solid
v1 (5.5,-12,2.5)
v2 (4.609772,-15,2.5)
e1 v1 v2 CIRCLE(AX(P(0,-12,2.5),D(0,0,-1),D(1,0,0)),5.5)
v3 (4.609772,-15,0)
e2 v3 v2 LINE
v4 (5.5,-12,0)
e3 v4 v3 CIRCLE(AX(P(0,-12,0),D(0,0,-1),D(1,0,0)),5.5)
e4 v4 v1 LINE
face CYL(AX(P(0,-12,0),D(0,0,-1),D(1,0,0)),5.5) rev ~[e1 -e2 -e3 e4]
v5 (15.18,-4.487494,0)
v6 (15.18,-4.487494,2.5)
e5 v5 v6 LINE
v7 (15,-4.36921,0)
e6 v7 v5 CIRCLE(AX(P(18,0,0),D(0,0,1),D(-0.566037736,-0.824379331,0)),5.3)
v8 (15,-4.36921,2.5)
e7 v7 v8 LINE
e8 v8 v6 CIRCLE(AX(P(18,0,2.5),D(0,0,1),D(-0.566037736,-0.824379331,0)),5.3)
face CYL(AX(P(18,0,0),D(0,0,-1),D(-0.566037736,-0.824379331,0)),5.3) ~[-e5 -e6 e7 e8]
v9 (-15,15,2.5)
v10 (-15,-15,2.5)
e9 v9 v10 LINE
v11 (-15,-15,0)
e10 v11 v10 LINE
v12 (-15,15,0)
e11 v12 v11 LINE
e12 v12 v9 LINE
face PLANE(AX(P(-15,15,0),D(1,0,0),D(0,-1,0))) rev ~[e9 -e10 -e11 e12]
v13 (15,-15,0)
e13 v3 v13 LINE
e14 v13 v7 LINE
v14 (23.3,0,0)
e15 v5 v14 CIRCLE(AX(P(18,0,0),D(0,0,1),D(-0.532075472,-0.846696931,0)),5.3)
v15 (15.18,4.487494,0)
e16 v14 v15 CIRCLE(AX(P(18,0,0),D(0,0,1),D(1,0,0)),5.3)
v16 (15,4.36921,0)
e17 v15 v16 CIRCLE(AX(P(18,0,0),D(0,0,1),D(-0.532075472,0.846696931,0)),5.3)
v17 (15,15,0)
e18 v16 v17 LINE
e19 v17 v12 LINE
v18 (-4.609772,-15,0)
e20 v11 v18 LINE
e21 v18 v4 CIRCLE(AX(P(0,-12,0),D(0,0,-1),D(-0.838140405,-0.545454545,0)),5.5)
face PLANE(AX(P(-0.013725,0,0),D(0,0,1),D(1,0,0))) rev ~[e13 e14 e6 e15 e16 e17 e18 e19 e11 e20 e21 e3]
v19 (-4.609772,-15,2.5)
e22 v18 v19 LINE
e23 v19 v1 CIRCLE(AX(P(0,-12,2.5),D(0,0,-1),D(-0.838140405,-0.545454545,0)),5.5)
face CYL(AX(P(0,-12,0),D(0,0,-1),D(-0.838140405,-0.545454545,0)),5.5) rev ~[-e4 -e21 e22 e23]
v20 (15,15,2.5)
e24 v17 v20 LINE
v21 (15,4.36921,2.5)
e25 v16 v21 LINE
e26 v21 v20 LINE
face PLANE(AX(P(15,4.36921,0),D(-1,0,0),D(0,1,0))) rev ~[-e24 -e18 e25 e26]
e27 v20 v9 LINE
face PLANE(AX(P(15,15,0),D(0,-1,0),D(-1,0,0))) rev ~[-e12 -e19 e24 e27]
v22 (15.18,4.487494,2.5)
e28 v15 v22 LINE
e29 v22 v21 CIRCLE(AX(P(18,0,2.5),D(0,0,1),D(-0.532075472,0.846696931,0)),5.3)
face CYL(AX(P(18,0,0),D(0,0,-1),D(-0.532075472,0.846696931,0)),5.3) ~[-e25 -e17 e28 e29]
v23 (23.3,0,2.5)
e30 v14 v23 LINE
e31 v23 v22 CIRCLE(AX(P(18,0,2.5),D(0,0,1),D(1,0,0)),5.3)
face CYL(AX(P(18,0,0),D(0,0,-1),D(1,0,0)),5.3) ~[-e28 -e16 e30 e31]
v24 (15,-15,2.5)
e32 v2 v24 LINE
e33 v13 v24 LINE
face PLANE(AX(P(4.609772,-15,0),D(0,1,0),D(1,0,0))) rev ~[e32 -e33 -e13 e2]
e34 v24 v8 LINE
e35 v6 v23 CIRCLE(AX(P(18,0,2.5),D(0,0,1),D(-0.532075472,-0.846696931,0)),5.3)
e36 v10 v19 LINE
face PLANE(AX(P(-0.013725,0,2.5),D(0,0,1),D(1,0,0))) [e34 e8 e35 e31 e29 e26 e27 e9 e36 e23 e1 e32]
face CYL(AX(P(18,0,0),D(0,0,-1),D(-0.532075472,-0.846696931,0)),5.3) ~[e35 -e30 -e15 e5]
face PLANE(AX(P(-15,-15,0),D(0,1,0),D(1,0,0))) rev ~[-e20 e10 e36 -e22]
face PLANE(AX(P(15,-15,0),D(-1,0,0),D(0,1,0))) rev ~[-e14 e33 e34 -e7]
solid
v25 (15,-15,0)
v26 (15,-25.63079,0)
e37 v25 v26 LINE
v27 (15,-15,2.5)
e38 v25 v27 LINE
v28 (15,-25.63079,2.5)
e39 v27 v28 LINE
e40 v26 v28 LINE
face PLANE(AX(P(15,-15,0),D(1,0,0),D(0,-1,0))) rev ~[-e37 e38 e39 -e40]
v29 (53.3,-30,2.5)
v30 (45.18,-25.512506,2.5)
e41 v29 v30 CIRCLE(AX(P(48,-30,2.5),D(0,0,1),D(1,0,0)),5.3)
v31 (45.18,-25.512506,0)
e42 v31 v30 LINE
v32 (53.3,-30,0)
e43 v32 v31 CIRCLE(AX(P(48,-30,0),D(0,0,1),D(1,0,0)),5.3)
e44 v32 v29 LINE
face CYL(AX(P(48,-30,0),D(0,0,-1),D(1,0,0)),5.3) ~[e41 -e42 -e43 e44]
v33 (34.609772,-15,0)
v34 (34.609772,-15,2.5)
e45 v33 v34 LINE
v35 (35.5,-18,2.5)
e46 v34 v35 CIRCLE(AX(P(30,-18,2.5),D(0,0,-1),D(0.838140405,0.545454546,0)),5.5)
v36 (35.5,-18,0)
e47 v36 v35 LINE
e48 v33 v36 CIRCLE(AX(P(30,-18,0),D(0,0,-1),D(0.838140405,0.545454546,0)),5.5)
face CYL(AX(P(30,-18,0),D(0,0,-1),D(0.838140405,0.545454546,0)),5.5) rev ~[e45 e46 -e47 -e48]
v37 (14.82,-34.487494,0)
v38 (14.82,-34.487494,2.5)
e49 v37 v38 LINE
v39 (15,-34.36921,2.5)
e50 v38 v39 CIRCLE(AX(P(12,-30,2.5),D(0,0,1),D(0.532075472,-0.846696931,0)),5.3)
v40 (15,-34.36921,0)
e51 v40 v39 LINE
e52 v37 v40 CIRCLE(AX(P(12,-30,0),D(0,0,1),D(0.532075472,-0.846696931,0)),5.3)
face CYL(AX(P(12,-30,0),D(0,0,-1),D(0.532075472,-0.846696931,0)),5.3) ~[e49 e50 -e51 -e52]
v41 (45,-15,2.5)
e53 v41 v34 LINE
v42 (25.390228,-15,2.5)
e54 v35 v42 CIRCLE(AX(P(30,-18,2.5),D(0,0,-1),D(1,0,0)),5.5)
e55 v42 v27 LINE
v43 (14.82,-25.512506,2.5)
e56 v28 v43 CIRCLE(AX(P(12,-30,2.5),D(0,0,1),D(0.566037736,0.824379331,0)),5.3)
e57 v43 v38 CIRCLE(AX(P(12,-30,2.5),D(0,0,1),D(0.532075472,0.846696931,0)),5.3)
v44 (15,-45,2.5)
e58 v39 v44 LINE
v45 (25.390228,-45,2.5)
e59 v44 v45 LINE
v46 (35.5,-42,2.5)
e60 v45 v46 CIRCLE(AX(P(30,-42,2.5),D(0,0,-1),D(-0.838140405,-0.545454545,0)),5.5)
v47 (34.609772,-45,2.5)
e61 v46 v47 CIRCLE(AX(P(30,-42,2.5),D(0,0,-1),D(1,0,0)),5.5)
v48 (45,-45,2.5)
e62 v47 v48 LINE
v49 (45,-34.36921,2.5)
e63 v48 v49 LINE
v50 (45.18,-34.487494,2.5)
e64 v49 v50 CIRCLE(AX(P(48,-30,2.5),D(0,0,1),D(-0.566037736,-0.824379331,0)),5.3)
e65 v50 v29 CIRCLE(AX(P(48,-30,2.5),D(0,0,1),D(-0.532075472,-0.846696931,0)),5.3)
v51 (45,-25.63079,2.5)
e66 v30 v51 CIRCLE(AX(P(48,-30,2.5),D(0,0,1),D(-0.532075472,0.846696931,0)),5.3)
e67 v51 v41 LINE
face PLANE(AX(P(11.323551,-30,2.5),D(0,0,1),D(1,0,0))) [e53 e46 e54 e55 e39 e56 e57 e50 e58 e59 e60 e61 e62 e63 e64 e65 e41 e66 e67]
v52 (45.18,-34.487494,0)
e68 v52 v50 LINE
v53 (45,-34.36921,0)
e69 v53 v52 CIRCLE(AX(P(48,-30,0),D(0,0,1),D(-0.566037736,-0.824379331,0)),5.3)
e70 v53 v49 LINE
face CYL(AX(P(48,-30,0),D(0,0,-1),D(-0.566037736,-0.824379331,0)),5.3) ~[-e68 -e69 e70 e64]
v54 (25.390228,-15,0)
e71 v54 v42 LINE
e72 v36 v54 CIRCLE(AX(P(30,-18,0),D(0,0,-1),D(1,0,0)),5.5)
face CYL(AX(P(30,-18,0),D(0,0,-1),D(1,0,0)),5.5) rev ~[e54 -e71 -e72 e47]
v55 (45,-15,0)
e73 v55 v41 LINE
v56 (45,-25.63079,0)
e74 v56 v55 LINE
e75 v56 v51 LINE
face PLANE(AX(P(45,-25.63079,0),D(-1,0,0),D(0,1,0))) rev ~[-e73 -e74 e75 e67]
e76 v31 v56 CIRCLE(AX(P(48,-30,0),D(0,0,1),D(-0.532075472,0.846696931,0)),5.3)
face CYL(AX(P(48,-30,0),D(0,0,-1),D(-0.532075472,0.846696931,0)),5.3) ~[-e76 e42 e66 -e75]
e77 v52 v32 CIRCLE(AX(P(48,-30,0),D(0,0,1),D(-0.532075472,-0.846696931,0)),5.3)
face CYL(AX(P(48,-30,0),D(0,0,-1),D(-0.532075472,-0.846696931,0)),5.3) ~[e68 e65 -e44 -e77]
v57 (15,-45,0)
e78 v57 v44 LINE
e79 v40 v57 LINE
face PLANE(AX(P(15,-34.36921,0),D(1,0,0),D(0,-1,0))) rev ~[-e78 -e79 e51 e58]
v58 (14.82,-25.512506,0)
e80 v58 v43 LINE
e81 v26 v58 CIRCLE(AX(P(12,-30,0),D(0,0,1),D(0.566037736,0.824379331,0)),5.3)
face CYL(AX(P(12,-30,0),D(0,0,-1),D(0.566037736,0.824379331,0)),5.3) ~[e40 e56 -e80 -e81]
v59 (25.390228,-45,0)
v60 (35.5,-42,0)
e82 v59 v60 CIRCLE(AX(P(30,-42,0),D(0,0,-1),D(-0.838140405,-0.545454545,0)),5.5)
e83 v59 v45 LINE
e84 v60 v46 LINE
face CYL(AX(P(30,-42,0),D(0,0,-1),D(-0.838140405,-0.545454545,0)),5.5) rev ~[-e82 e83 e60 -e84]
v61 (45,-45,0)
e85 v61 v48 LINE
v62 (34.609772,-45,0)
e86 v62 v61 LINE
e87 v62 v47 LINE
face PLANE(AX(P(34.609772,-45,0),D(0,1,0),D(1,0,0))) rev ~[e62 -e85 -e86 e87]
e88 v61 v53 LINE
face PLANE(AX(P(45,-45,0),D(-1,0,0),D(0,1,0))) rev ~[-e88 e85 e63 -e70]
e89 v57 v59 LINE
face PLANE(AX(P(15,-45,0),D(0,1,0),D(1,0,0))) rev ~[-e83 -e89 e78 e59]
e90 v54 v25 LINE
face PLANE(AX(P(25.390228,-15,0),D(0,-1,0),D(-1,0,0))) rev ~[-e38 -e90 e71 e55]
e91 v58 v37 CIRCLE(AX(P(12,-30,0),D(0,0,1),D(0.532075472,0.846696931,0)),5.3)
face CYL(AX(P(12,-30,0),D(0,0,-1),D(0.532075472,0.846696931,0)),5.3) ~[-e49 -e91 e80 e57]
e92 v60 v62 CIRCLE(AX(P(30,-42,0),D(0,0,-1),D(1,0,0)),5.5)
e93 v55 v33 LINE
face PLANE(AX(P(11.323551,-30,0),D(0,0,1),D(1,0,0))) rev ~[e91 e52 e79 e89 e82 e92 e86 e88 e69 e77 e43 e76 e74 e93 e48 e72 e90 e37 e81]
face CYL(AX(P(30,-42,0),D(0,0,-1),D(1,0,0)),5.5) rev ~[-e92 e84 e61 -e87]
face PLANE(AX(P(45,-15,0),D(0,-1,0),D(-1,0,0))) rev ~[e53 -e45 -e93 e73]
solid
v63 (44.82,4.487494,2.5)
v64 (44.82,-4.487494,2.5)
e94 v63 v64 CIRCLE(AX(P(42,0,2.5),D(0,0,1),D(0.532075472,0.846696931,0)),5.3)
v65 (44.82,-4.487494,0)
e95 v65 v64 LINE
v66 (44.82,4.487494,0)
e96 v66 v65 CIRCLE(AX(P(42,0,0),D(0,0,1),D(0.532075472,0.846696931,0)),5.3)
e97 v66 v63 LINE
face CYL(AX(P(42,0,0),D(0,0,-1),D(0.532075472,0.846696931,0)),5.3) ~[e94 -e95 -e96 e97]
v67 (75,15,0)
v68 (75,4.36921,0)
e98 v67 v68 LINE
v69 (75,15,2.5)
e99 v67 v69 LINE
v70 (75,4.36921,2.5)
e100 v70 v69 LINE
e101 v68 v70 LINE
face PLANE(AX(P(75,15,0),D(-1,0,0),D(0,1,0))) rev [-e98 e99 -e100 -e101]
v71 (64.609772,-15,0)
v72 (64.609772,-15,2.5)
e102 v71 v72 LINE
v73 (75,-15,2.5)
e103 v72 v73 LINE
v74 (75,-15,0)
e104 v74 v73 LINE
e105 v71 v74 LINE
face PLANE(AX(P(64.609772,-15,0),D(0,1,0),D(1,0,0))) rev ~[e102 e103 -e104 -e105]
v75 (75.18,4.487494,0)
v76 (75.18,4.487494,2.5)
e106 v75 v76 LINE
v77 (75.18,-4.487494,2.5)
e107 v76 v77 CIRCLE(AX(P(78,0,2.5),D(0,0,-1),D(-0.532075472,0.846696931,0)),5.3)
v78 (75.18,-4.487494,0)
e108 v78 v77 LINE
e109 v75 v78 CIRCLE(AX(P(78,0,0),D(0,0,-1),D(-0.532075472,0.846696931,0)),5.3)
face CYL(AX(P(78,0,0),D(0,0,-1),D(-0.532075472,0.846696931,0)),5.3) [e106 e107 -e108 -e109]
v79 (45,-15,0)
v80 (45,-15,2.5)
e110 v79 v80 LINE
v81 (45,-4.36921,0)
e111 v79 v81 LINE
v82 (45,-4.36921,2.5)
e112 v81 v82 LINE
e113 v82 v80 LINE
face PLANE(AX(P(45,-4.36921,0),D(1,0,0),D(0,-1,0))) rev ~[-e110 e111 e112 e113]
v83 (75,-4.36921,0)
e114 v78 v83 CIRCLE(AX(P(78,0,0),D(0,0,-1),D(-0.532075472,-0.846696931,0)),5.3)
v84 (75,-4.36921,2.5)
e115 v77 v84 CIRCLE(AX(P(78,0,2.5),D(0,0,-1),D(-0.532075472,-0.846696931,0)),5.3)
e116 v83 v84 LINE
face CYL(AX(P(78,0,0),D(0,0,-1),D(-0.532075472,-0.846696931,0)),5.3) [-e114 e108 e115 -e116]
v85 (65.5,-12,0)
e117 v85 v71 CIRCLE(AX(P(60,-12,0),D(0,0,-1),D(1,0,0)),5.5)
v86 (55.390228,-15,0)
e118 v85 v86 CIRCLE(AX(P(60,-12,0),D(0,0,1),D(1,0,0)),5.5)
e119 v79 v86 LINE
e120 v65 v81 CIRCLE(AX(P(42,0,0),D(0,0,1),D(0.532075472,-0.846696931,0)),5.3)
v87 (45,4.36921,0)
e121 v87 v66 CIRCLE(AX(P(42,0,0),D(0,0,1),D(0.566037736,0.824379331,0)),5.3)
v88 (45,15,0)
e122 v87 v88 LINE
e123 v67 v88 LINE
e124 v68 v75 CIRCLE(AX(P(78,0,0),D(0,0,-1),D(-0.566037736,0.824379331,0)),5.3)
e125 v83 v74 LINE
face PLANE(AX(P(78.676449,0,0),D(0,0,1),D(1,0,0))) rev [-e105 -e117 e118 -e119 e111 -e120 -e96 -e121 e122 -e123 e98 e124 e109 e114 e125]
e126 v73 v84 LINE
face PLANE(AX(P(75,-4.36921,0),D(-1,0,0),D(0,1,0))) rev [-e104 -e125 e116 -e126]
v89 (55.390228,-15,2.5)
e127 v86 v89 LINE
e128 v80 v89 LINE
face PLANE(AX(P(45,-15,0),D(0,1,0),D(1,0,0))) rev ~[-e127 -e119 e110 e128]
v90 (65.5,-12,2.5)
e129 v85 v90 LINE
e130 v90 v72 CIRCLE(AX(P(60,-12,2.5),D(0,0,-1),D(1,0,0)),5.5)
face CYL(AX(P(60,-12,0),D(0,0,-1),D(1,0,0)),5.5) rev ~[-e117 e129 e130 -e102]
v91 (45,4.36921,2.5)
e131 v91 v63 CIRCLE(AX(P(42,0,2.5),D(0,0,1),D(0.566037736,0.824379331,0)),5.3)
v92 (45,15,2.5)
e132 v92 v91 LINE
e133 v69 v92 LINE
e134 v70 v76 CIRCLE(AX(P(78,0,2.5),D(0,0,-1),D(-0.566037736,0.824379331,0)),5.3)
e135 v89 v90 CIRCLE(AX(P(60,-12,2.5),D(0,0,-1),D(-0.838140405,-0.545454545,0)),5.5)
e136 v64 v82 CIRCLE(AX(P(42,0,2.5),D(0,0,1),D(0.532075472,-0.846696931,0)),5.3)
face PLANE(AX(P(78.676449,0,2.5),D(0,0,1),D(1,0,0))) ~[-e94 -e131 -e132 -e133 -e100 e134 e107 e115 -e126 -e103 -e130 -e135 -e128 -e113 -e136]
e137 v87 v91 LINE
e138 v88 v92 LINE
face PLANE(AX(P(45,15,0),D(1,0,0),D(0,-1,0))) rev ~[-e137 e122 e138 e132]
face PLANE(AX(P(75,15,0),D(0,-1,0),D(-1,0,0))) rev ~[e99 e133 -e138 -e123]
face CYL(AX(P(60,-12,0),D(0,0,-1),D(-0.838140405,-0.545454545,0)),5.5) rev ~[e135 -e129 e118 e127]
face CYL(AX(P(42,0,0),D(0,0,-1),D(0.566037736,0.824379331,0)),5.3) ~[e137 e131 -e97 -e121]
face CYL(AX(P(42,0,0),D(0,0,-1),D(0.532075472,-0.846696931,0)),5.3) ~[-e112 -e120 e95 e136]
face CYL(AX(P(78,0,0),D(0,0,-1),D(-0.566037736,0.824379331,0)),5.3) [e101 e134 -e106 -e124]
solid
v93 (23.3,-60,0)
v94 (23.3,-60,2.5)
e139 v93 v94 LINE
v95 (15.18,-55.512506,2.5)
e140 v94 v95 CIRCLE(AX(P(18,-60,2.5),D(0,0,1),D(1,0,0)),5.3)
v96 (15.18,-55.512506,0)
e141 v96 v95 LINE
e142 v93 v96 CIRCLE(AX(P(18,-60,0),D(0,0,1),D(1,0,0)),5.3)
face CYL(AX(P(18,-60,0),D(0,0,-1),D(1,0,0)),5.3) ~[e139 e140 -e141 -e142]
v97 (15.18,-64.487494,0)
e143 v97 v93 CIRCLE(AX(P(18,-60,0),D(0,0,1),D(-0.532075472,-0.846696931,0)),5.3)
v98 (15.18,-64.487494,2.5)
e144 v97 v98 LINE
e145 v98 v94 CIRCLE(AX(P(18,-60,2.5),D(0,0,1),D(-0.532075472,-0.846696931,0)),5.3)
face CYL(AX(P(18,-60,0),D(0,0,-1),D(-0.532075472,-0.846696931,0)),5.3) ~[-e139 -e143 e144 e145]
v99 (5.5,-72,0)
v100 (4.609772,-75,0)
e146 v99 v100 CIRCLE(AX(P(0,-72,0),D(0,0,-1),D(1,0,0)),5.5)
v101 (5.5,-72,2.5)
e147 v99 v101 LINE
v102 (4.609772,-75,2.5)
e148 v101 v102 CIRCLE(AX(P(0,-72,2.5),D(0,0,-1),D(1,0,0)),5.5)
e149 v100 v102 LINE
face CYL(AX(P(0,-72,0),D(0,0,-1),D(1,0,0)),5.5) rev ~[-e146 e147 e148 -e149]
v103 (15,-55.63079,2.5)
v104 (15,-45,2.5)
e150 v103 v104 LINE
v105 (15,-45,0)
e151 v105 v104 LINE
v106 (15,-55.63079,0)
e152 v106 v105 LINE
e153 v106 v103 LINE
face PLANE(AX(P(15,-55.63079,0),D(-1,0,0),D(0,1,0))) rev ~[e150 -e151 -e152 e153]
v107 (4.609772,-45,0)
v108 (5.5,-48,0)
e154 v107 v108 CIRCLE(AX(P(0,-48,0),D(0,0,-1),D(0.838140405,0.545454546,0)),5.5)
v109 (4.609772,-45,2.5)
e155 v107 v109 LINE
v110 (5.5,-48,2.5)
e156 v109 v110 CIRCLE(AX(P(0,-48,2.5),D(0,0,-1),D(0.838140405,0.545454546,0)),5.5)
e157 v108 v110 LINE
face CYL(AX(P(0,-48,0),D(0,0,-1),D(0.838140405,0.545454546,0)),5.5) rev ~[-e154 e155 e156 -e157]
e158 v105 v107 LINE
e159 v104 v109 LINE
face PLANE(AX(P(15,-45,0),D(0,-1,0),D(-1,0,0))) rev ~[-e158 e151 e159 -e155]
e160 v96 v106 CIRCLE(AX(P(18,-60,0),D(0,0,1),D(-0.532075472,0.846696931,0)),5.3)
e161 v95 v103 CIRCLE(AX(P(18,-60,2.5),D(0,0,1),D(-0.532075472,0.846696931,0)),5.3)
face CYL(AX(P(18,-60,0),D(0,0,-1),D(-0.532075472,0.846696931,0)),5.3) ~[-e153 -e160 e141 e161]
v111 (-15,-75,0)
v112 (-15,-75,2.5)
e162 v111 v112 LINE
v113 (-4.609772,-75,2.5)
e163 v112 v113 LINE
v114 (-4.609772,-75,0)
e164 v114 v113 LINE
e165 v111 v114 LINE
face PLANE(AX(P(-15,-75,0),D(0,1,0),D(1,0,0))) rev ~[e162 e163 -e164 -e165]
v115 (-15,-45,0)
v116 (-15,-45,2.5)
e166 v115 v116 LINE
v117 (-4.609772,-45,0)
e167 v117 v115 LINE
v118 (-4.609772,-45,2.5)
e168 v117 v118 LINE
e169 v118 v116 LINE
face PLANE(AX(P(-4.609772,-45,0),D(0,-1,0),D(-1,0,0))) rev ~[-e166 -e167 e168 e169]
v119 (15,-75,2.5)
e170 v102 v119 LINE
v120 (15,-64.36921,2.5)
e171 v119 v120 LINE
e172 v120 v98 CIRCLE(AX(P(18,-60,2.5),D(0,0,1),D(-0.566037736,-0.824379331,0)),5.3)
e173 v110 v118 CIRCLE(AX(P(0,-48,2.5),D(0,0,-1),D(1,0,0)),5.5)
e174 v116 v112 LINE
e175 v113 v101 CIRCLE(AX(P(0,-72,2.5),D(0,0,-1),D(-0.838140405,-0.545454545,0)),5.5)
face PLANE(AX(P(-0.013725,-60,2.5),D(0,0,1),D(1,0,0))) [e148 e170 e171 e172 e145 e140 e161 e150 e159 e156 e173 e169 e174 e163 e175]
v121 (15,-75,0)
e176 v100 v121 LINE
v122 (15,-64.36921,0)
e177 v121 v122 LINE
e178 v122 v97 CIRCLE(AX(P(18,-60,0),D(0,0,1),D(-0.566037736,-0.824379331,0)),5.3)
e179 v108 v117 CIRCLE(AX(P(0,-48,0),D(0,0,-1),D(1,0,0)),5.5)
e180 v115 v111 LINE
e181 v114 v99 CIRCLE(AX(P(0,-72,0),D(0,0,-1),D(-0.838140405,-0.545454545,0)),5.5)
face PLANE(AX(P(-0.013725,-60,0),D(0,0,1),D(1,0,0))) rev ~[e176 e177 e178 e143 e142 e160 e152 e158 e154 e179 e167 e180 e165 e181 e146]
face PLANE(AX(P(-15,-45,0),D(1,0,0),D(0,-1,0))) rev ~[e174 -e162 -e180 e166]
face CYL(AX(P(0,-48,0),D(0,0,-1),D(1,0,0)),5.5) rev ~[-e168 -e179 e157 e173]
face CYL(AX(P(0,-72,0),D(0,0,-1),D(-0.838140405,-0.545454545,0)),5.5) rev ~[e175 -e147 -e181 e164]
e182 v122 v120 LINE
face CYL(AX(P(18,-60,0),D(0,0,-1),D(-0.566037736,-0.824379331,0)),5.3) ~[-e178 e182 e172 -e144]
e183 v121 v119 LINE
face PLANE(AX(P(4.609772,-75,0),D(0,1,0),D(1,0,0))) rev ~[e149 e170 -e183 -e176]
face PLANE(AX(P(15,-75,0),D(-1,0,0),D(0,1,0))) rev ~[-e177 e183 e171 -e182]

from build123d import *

# Parameters (mm, degrees)
F1_DEPTH = 2.5
F2_DEPTH = 2.5
F3_DEPTH = 2.5
F4_DEPTH = 2.5
F5_ANGLE = 45
F7_ANGLE = -45


# Not quite as in the source:
# - a pattern or mirror of a feature is missing from the dataset's text; its kind, count and spacing are read off the source's solid
# - a feature names something its author has since deleted; it is built from what else it names


with BuildPart() as f1:
    # F0 (on Top) → F1 (new body)
    with BuildSketch(Plane.XY):
        with BuildLine():
            Line((15, 4.6097722286), (15, 15))
            Line((15, 15), (4.6097722286, 15))
            ThreePointArc((4.6097722286, 15), (5.2727482046, 13.564648961), (5.5, 12))
            ThreePointArc((5.5, 12), (-1.564648961, 6.7272517954), (-4.6097722286, 15))
            Line((-4.6097722286, 15), (-15, 15))
            Line((-15, 15), (-15, 4.6097722286))
            ThreePointArc((-15, 4.6097722286), (-9.3779778796, 4.8347699015), (-6.5, 0))
            ThreePointArc((-6.5, 0), (-9.3779778796, -4.8347699015), (-15, -4.6097722286))
            Line((-15, -4.6097722286), (-15, -15))
            Line((-15, -15), (-4.6097722286, -15))
            ThreePointArc((-4.6097722286, -15), (-1.564648961, -6.7272517954), (5.5, -12))
            ThreePointArc((5.5, -12), (5.2727482046, -13.564648961), (4.6097722286, -15))
            Line((4.6097722286, -15), (15, -15))
            Line((15, -15), (15, -4.6097722286))
            ThreePointArc((15, -4.6097722286), (6.5, 0), (15, 4.6097722286))
        make_face()
        with BuildLine():
            ThreePointArc((5.5, 12), (5.2727482046, 13.564648961), (4.6097722286, 15))
            Line((4.6097722286, 15), (4.369210455, 15))
            ThreePointArc((4.369210455, 15), (5.0619569048, 13.5705388547), (5.3, 12))
            ThreePointArc((5.3, 12), (-1.5705388547, 6.9380430952), (-4.369210455, 15))
            Line((-4.369210455, 15), (-4.6097722286, 15))
            ThreePointArc((-4.6097722286, 15), (-1.564648961, 6.7272517954), (5.5, 12))
        make_face()
        with BuildLine():
            ThreePointArc((15.18, 4.4874937326), (15.0893990769, 4.4292665608), (15, 4.369210455))
            ThreePointArc((15, 4.369210455), (16.6898827277, 2.4688053791), (17.3, 0))
            ThreePointArc((17.3, 0), (16.6898827277, -2.4688053791), (15, -4.369210455))
            ThreePointArc((15, -4.369210455), (15.0893990769, -4.4292665608), (15.18, -4.4874937326))
            ThreePointArc((15.18, -4.4874937326), (16.8856934001, -2.5258661881), (17.5, 0))
            ThreePointArc((17.5, 0), (16.8856934001, 2.5258661881), (15.18, 4.4874937326))
        make_face()
        with BuildLine():
            ThreePointArc((-6.7, 0), (-9.5311946209, 4.6898827277), (-15, 4.369210455))
            Line((-15, 4.369210455), (-15, -4.369210455))
            ThreePointArc((-15, -4.369210455), (-9.5311946209, -4.6898827277), (-6.7, 0))
        make_face()
        with BuildLine():
            ThreePointArc((5.3, 12), (5.0619569048, 13.5705388547), (4.369210455, 15))
            Line((4.369210455, 15), (-4.369210455, 15))
            ThreePointArc((-4.369210455, 15), (-1.5705388547, 6.9380430952), (5.3, 12))
        make_face()
        with BuildLine():
            ThreePointArc((14.82, -4.4874937326), (12.5, 0), (14.82, 4.4874937326))
            ThreePointArc((14.82, 4.4874937326), (6.7, 0), (14.82, -4.4874937326))
        make_face()
        with BuildLine():
            Line((15, -4.369210455), (15, 4.369210455))
            ThreePointArc((15, 4.369210455), (12.7, 0), (15, -4.369210455))
        make_face()
        with BuildLine():
            ThreePointArc((17.3, 0), (16.6898827277, 2.4688053791), (15, 4.369210455))
            Line((15, 4.369210455), (15, -4.369210455))
            ThreePointArc((15, -4.369210455), (16.6898827277, -2.4688053791), (17.3, 0))
        make_face()
        with BuildLine():
            ThreePointArc((23.3, 0), (20.5635912311, 4.6387498316), (15.18, 4.4874937326))
            ThreePointArc((15.18, 4.4874937326), (16.8856934001, 2.5258661881), (17.5, 0))
            ThreePointArc((17.5, 0), (16.8856934001, -2.5258661881), (15.18, -4.4874937326))
            ThreePointArc((15.18, -4.4874937326), (20.5635912311, -4.6387498316), (23.3, 0))
        make_face()
        with BuildLine():
            ThreePointArc((15, -4.369210455), (12.7, 0), (15, 4.369210455))
            ThreePointArc((15, 4.369210455), (14.9106009231, 4.4292665608), (14.82, 4.4874937326))
            ThreePointArc((14.82, 4.4874937326), (12.5, 0), (14.82, -4.4874937326))
            ThreePointArc((14.82, -4.4874937326), (14.9106009231, -4.4292665608), (15, -4.369210455))
        make_face()
        with BuildLine():
            ThreePointArc((-6.5, 0), (-9.3779778796, 4.8347699015), (-15, 4.6097722286))
            Line((-15, 4.6097722286), (-15, 4.369210455))
            ThreePointArc((-15, 4.369210455), (-9.5311946209, 4.6898827277), (-6.7, 0))
            ThreePointArc((-6.7, 0), (-9.5311946209, -4.6898827277), (-15, -4.369210455))
            Line((-15, -4.369210455), (-15, -4.6097722286))
            ThreePointArc((-15, -4.6097722286), (-9.3779778796, -4.8347699015), (-6.5, 0))
        make_face()
        with BuildLine():
            ThreePointArc((14.82, 4.4874937326), (14.9093952036, 4.5495232709), (15, 4.6097722286))
            ThreePointArc((15, 4.6097722286), (6.5, 0), (15, -4.6097722286))
            ThreePointArc((15, -4.6097722286), (14.9093952036, -4.5495232709), (14.82, -4.4874937326))
            ThreePointArc((14.82, -4.4874937326), (6.7, 0), (14.82, 4.4874937326))
        make_face()
        with BuildLine():
            Line((15, 4.369210455), (15, 4.6097722286))
            ThreePointArc((15, 4.6097722286), (14.9093952036, 4.5495232709), (14.82, 4.4874937326))
            ThreePointArc((14.82, 4.4874937326), (14.9106009231, 4.4292665608), (15, 4.369210455))
        make_face()
        with BuildLine():
            ThreePointArc((14.82, -4.4874937326), (14.9093952036, -4.5495232709), (15, -4.6097722286))
            Line((15, -4.6097722286), (15, -4.369210455))
            ThreePointArc((15, -4.369210455), (14.9106009231, -4.4292665608), (14.82, -4.4874937326))
        make_face()
    extrude(amount=F1_DEPTH)


with BuildPart() as f2:
    # F0 (on Top) → F2 (new body)
    with BuildSketch(Plane.XY):
        with BuildLine():
            ThreePointArc((44.82, -4.4874937326), (42.5, 0), (44.82, 4.4874937326))
            ThreePointArc((44.82, 4.4874937326), (36.7, 0), (44.82, -4.4874937326))
        make_face()
        with BuildLine():
            Line((45, -4.369210455), (45, 4.369210455))
            ThreePointArc((45, 4.369210455), (42.7, 0), (45, -4.369210455))
        make_face()
        with BuildLine():
            ThreePointArc((45, -4.369210455), (42.7, 0), (45, 4.369210455))
            ThreePointArc((45, 4.369210455), (44.9106009231, 4.4292665608), (44.82, 4.4874937326))
            ThreePointArc((44.82, 4.4874937326), (42.5, 0), (44.82, -4.4874937326))
            ThreePointArc((44.82, -4.4874937326), (44.9106009231, -4.4292665608), (45, -4.369210455))
        make_face()
        with BuildLine():
            ThreePointArc((47.3, 0), (46.6898827277, 2.4688053791), (45, 4.369210455))
            Line((45, 4.369210455), (45, -4.369210455))
            ThreePointArc((45, -4.369210455), (46.6898827277, -2.4688053791), (47.3, 0))
        make_face()
        with BuildLine():
            ThreePointArc((47.5, 0), (46.8856934001, 2.5258661881), (45.18, 4.4874937326))
            ThreePointArc((45.18, 4.4874937326), (45.0893990769, 4.4292665608), (45, 4.369210455))
            ThreePointArc((45, 4.369210455), (46.6898827277, 2.4688053791), (47.3, 0))
            ThreePointArc((47.3, 0), (46.6898827277, -2.4688053791), (45, -4.369210455))
            ThreePointArc((45, -4.369210455), (45.0893990769, -4.4292665608), (45.18, -4.4874937326))
            ThreePointArc((45.18, -4.4874937326), (46.8856934001, -2.5258661881), (47.5, 0))
        make_face()
        with BuildLine():
            ThreePointArc((53.3, 0), (50.5635912311, 4.6387498316), (45.18, 4.4874937326))
            ThreePointArc((45.18, 4.4874937326), (46.8856934001, 2.5258661881), (47.5, 0))
            ThreePointArc((47.5, 0), (46.8856934001, -2.5258661881), (45.18, -4.4874937326))
            ThreePointArc((45.18, -4.4874937326), (50.5635912311, -4.6387498316), (53.3, 0))
        make_face()
        with BuildLine():
            ThreePointArc((53.5, 0), (50.6220221204, 4.8347699015), (45, 4.6097722286))
            ThreePointArc((45, 4.6097722286), (45.0906047964, 4.5495232709), (45.18, 4.4874937326))
            ThreePointArc((45.18, 4.4874937326), (50.5635912311, 4.6387498316), (53.3, 0))
            ThreePointArc((53.3, 0), (50.5635912311, -4.6387498316), (45.18, -4.4874937326))
            ThreePointArc((45.18, -4.4874937326), (45.0906047964, -4.5495232709), (45, -4.6097722286))
            ThreePointArc((45, -4.6097722286), (50.6220221204, -4.8347699015), (53.5, 0))
        make_face()
        with BuildLine():
            Line((55.3902277714, 15), (45, 15))
            Line((45, 15), (45, 4.6097722286))
            ThreePointArc((45, 4.6097722286), (50.6220221204, 4.8347699015), (53.5, 0))
            ThreePointArc((53.5, 0), (50.6220221204, -4.8347699015), (45, -4.6097722286))
            Line((45, -4.6097722286), (45, -15))
            Line((45, -15), (55.3902277714, -15))
            ThreePointArc((55.3902277714, -15), (58.435351039, -6.7272517954), (65.5, -12))
            ThreePointArc((65.5, -12), (65.2727482046, -13.564648961), (64.6097722286, -15))
            Line((64.6097722286, -15), (75, -15))
            Line((75, -15), (75, -4.6097722286))
            ThreePointArc((75, -4.6097722286), (66.5, 0), (75, 4.6097722286))
            Line((75, 4.6097722286), (75, 15))
            Line((75, 15), (64.6097722286, 15))
            ThreePointArc((64.6097722286, 15), (65.2727482046, 13.564648961), (65.5, 12))
            ThreePointArc((65.5, 12), (58.435351039, 6.7272517954), (55.3902277714, 15))
        make_face()
        with BuildLine():
            ThreePointArc((45.18, 4.4874937326), (45.0906047964, 4.5495232709), (45, 4.6097722286))
            Line((45, 4.6097722286), (45, 4.369210455))
            ThreePointArc((45, 4.369210455), (45.0893990769, 4.4292665608), (45.18, 4.4874937326))
        make_face()
        with BuildLine():
            Line((45, -4.369210455), (45, -4.6097722286))
            ThreePointArc((45, -4.6097722286), (45.0906047964, -4.5495232709), (45.18, -4.4874937326))
            ThreePointArc((45.18, -4.4874937326), (45.0893990769, -4.4292665608), (45, -4.369210455))
        make_face()
        with BuildLine():
            Line((64.369210455, 15), (55.630789545, 15))
            ThreePointArc((55.630789545, 15), (58.4294611453, 6.9380430952), (65.3, 12))
            ThreePointArc((65.3, 12), (65.0619569048, 13.5705388547), (64.369210455, 15))
        make_face()
        with BuildLine():
            Line((55.630789545, 15), (55.3902277714, 15))
            ThreePointArc((55.3902277714, 15), (58.435351039, 6.7272517954), (65.5, 12))
            ThreePointArc((65.5, 12), (65.2727482046, 13.564648961), (64.6097722286, 15))
            Line((64.6097722286, 15), (64.369210455, 15))
            ThreePointArc((64.369210455, 15), (65.0619569048, 13.5705388547), (65.3, 12))
            ThreePointArc((65.3, 12), (58.4294611453, 6.9380430952), (55.630789545, 15))
        make_face()
    extrude(amount=F2_DEPTH)



with BuildPart() as f2b:
    # F0 (on Top) → F2, piece 2 (new body)
    with BuildSketch(Plane.XY):
        with BuildLine():
            ThreePointArc((77.3, 0), (76.6898827277, 2.4688053791), (75, 4.369210455))
            Line((75, 4.369210455), (75, -4.369210455))
            ThreePointArc((75, -4.369210455), (76.6898827277, -2.4688053791), (77.3, 0))
        make_face()
        with BuildLine():
            Line((75, -4.369210455), (75, 4.369210455))
            ThreePointArc((75, 4.369210455), (72.7, 0), (75, -4.369210455))
        make_face()
    extrude(amount=F2_DEPTH)


with BuildPart() as f2_1:
    add(f2.part)

    add(f2b.part)  # F2_copies merges F2b
    # F2_copies: F2 across plane
    add(f2.part.mirror(Plane(origin=(60, 0, 0), x_dir=(0, 0, 1), z_dir=(1, 0, 0))))


with BuildPart() as f3:
    # F0 (on Top) → F3 (new body)
    with BuildSketch(Plane.XY):
        with BuildLine():
            Line((15, -55.3902277714), (15, -45))
            Line((15, -45), (4.6097722286, -45))
            ThreePointArc((4.6097722286, -45), (5.2727482046, -46.435351039), (5.5, -48))
            ThreePointArc((5.5, -48), (-1.564648961, -53.2727482046), (-4.6097722286, -45))
            Line((-4.6097722286, -45), (-15, -45))
            Line((-15, -45), (-15, -55.3902277714))
            ThreePointArc((-15, -55.3902277714), (-9.3779778796, -55.1652300985), (-6.5, -60))
            ThreePointArc((-6.5, -60), (-9.3779778796, -64.8347699015), (-15, -64.6097722286))
            Line((-15, -64.6097722286), (-15, -75))
            Line((-15, -75), (-4.6097722286, -75))
            ThreePointArc((-4.6097722286, -75), (-1.564648961, -66.7272517954), (5.5, -72))
            ThreePointArc((5.5, -72), (5.2727482046, -73.564648961), (4.6097722286, -75))
            Line((4.6097722286, -75), (15, -75))
            Line((15, -75), (15, -64.6097722286))
            ThreePointArc((15, -64.6097722286), (6.5, -60), (15, -55.3902277714))
        make_face()
        with BuildLine():
            ThreePointArc((-6.7, -60), (-9.5311946209, -55.3101172723), (-15, -55.630789545))
            Line((-15, -55.630789545), (-15, -64.369210455))
            ThreePointArc((-15, -64.369210455), (-9.5311946209, -64.6898827277), (-6.7, -60))
        make_face()
        with BuildLine():
            ThreePointArc((14.82, -64.4874937326), (12.5, -60), (14.82, -55.5125062674))
            ThreePointArc((14.82, -55.5125062674), (6.7, -60), (14.82, -64.4874937326))
        make_face()
        with BuildLine():
            ThreePointArc((23.3, -60), (20.5635912311, -55.3612501684), (15.18, -55.5125062674))
            ThreePointArc((15.18, -55.5125062674), (16.8856934001, -57.4741338119), (17.5, -60))
            ThreePointArc((17.5, -60), (16.8856934001, -62.5258661881), (15.18, -64.4874937326))
            ThreePointArc((15.18, -64.4874937326), (20.5635912311, -64.6387498316), (23.3, -60))
        make_face()
        with BuildLine():
            ThreePointArc((17.3, -60), (16.6898827277, -57.5311946209), (15, -55.630789545))
            Line((15, -55.630789545), (15, -64.369210455))
            ThreePointArc((15, -64.369210455), (16.6898827277, -62.4688053791), (17.3, -60))
        make_face()
        with BuildLine():
            Line((15, -64.369210455), (15, -55.630789545))
            ThreePointArc((15, -55.630789545), (12.7, -60), (15, -64.369210455))
        make_face()
        with BuildLine():
            ThreePointArc((-6.5, -60), (-9.3779778796, -55.1652300985), (-15, -55.3902277714))
            Line((-15, -55.3902277714), (-15, -55.630789545))
            ThreePointArc((-15, -55.630789545), (-9.5311946209, -55.3101172723), (-6.7, -60))
            ThreePointArc((-6.7, -60), (-9.5311946209, -64.6898827277), (-15, -64.369210455))
            Line((-15, -64.369210455), (-15, -64.6097722286))
            ThreePointArc((-15, -64.6097722286), (-9.3779778796, -64.8347699015), (-6.5, -60))
        make_face()
        with BuildLine():
            ThreePointArc((14.82, -55.5125062674), (14.9093952036, -55.4504767291), (15, -55.3902277714))
            ThreePointArc((15, -55.3902277714), (6.5, -60), (15, -64.6097722286))
            ThreePointArc((15, -64.6097722286), (14.9093952036, -64.5495232709), (14.82, -64.4874937326))
            ThreePointArc((14.82, -64.4874937326), (6.7, -60), (14.82, -55.5125062674))
        make_face()
        with BuildLine():
            ThreePointArc((15, -64.369210455), (12.7, -60), (15, -55.630789545))
            ThreePointArc((15, -55.630789545), (14.9106009231, -55.5707334392), (14.82, -55.5125062674))
            ThreePointArc((14.82, -55.5125062674), (12.5, -60), (14.82, -64.4874937326))
            ThreePointArc((14.82, -64.4874937326), (14.9106009231, -64.4292665608), (15, -64.369210455))
        make_face()
        with BuildLine():
            ThreePointArc((17.5, -60), (16.8856934001, -57.4741338119), (15.18, -55.5125062674))
            ThreePointArc((15.18, -55.5125062674), (15.0893990769, -55.5707334392), (15, -55.630789545))
            ThreePointArc((15, -55.630789545), (16.6898827277, -57.5311946209), (17.3, -60))
            ThreePointArc((17.3, -60), (16.6898827277, -62.4688053791), (15, -64.369210455))
            ThreePointArc((15, -64.369210455), (15.0893990769, -64.4292665608), (15.18, -64.4874937326))
            ThreePointArc((15.18, -64.4874937326), (16.8856934001, -62.5258661881), (17.5, -60))
        make_face()
        with BuildLine():
            Line((15, -55.630789545), (15, -55.3902277714))
            ThreePointArc((15, -55.3902277714), (14.9093952036, -55.4504767291), (14.82, -55.5125062674))
            ThreePointArc((14.82, -55.5125062674), (14.9106009231, -55.5707334392), (15, -55.630789545))
        make_face()
        with BuildLine():
            ThreePointArc((14.82, -64.4874937326), (14.9093952036, -64.5495232709), (15, -64.6097722286))
            Line((15, -64.6097722286), (15, -64.369210455))
            ThreePointArc((15, -64.369210455), (14.9106009231, -64.4292665608), (14.82, -64.4874937326))
        make_face()
    extrude(amount=F3_DEPTH)


with BuildPart() as f4:
    # F0 (on Top) → F4 (new body)
    with BuildSketch(Plane.XY):
        with BuildLine():
            ThreePointArc((14.82, -34.4874937326), (12.5, -30), (14.82, -25.5125062674))
            ThreePointArc((14.82, -25.5125062674), (6.7, -30), (14.82, -34.4874937326))
        make_face()
        with BuildLine():
            Line((25.3902277714, -15), (15, -15))
            Line((15, -15), (15, -25.3902277714))
            ThreePointArc((15, -25.3902277714), (20.6220221204, -25.1652300985), (23.5, -30))
            ThreePointArc((23.5, -30), (20.6220221204, -34.8347699015), (15, -34.6097722286))
            Line((15, -34.6097722286), (15, -45))
            Line((15, -45), (25.3902277714, -45))
            ThreePointArc((25.3902277714, -45), (28.435351039, -36.7272517954), (35.5, -42))
            ThreePointArc((35.5, -42), (35.2727482046, -43.564648961), (34.6097722286, -45))
            Line((34.6097722286, -45), (45, -45))
            Line((45, -45), (45, -34.6097722286))
            ThreePointArc((45, -34.6097722286), (36.5, -30), (45, -25.3902277714))
            Line((45, -25.3902277714), (45, -15))
            Line((45, -15), (34.6097722286, -15))
            ThreePointArc((34.6097722286, -15), (35.2727482046, -16.435351039), (35.5, -18))
            ThreePointArc((35.5, -18), (28.435351039, -23.2727482046), (25.3902277714, -15))
        make_face()
        with BuildLine():
            ThreePointArc((23.3, -30), (20.5635912311, -25.3612501684), (15.18, -25.5125062674))
            ThreePointArc((15.18, -25.5125062674), (16.8856934001, -27.4741338119), (17.5, -30))
            ThreePointArc((17.5, -30), (16.8856934001, -32.5258661881), (15.18, -34.4874937326))
            ThreePointArc((15.18, -34.4874937326), (20.5635912311, -34.6387498316), (23.3, -30))
        make_face()
        with BuildLine():
            ThreePointArc((17.3, -30), (16.6898827277, -27.5311946209), (15, -25.630789545))
            Line((15, -25.630789545), (15, -34.369210455))
            ThreePointArc((15, -34.369210455), (16.6898827277, -32.4688053791), (17.3, -30))
        make_face()
        with BuildLine():
            Line((15, -34.369210455), (15, -25.630789545))
            ThreePointArc((15, -25.630789545), (12.7, -30), (15, -34.369210455))
        make_face()
        with BuildLine():
            ThreePointArc((53.3, -30), (50.5635912311, -25.3612501684), (45.18, -25.5125062674))
            ThreePointArc((45.18, -25.5125062674), (46.8856934001, -27.4741338119), (47.5, -30))
            ThreePointArc((47.5, -30), (46.8856934001, -32.5258661881), (45.18, -34.4874937326))
            ThreePointArc((45.18, -34.4874937326), (50.5635912311, -34.6387498316), (53.3, -30))
        make_face()
        with BuildLine():
            ThreePointArc((47.3, -30), (46.6898827277, -27.5311946209), (45, -25.630789545))
            Line((45, -25.630789545), (45, -34.369210455))
            ThreePointArc((45, -34.369210455), (46.6898827277, -32.4688053791), (47.3, -30))
        make_face()
        with BuildLine():
            Line((45, -34.369210455), (45, -25.630789545))
            ThreePointArc((45, -25.630789545), (42.7, -30), (45, -34.369210455))
        make_face()
        with BuildLine():
            ThreePointArc((44.82, -34.4874937326), (42.5, -30), (44.82, -25.5125062674))
            ThreePointArc((44.82, -25.5125062674), (36.7, -30), (44.82, -34.4874937326))
        make_face()
        with BuildLine():
            ThreePointArc((17.5, -30), (16.8856934001, -27.4741338119), (15.18, -25.5125062674))
            ThreePointArc((15.18, -25.5125062674), (15.0893990769, -25.5707334392), (15, -25.630789545))
            ThreePointArc((15, -25.630789545), (16.6898827277, -27.5311946209), (17.3, -30))
            ThreePointArc((17.3, -30), (16.6898827277, -32.4688053791), (15, -34.369210455))
            ThreePointArc((15, -34.369210455), (15.0893990769, -34.4292665608), (15.18, -34.4874937326))
            ThreePointArc((15.18, -34.4874937326), (16.8856934001, -32.5258661881), (17.5, -30))
        make_face()
        with BuildLine():
            ThreePointArc((15, -34.369210455), (12.7, -30), (15, -25.630789545))
            ThreePointArc((15, -25.630789545), (14.9106009231, -25.5707334392), (14.82, -25.5125062674))
            ThreePointArc((14.82, -25.5125062674), (12.5, -30), (14.82, -34.4874937326))
            ThreePointArc((14.82, -34.4874937326), (14.9106009231, -34.4292665608), (15, -34.369210455))
        make_face()
        with BuildLine():
            ThreePointArc((23.5, -30), (20.6220221204, -25.1652300985), (15, -25.3902277714))
            ThreePointArc((15, -25.3902277714), (15.0906047964, -25.4504767291), (15.18, -25.5125062674))
            ThreePointArc((15.18, -25.5125062674), (20.5635912311, -25.3612501684), (23.3, -30))
            ThreePointArc((23.3, -30), (20.5635912311, -34.6387498316), (15.18, -34.4874937326))
            ThreePointArc((15.18, -34.4874937326), (15.0906047964, -34.5495232709), (15, -34.6097722286))
            ThreePointArc((15, -34.6097722286), (20.6220221204, -34.8347699015), (23.5, -30))
        make_face()
        with BuildLine():
            ThreePointArc((15.18, -25.5125062674), (15.0906047964, -25.4504767291), (15, -25.3902277714))
            Line((15, -25.3902277714), (15, -25.630789545))
            ThreePointArc((15, -25.630789545), (15.0893990769, -25.5707334392), (15.18, -25.5125062674))
        make_face()
        with BuildLine():
            Line((15, -34.369210455), (15, -34.6097722286))
            ThreePointArc((15, -34.6097722286), (15.0906047964, -34.5495232709), (15.18, -34.4874937326))
            ThreePointArc((15.18, -34.4874937326), (15.0893990769, -34.4292665608), (15, -34.369210455))
        make_face()
        with BuildLine():
            ThreePointArc((44.82, -25.5125062674), (44.9093952036, -25.4504767291), (45, -25.3902277714))
            ThreePointArc((45, -25.3902277714), (36.5, -30), (45, -34.6097722286))
            ThreePointArc((45, -34.6097722286), (44.9093952036, -34.5495232709), (44.82, -34.4874937326))
            ThreePointArc((44.82, -34.4874937326), (36.7, -30), (44.82, -25.5125062674))
        make_face()
        with BuildLine():
            ThreePointArc((44.82, -34.4874937326), (44.9093952036, -34.5495232709), (45, -34.6097722286))
            Line((45, -34.6097722286), (45, -34.369210455))
            ThreePointArc((45, -34.369210455), (44.9106009231, -34.4292665608), (44.82, -34.4874937326))
        make_face()
        with BuildLine():
            ThreePointArc((45, -34.369210455), (42.7, -30), (45, -25.630789545))
            ThreePointArc((45, -25.630789545), (44.9106009231, -25.5707334392), (44.82, -25.5125062674))
            ThreePointArc((44.82, -25.5125062674), (42.5, -30), (44.82, -34.4874937326))
            ThreePointArc((44.82, -34.4874937326), (44.9106009231, -34.4292665608), (45, -34.369210455))
        make_face()
        with BuildLine():
            ThreePointArc((47.5, -30), (46.8856934001, -27.4741338119), (45.18, -25.5125062674))
            ThreePointArc((45.18, -25.5125062674), (45.0893990769, -25.5707334392), (45, -25.630789545))
            ThreePointArc((45, -25.630789545), (46.6898827277, -27.5311946209), (47.3, -30))
            ThreePointArc((47.3, -30), (46.6898827277, -32.4688053791), (45, -34.369210455))
            ThreePointArc((45, -34.369210455), (45.0893990769, -34.4292665608), (45.18, -34.4874937326))
            ThreePointArc((45.18, -34.4874937326), (46.8856934001, -32.5258661881), (47.5, -30))
        make_face()
        with BuildLine():
            Line((45, -25.630789545), (45, -25.3902277714))
            ThreePointArc((45, -25.3902277714), (44.9093952036, -25.4504767291), (44.82, -25.5125062674))
            ThreePointArc((44.82, -25.5125062674), (44.9106009231, -25.5707334392), (45, -25.630789545))
        make_face()
    extrude(amount=F4_DEPTH)


with BuildPart() as f1_1:
    # F5: moved
    add(f1.part.rotate(Axis((-4.6097722286, -15, 1.25), (0, 0, -1)), F5_ANGLE))


with BuildPart() as f2_2:
    # F5: moved
    add(f2_1.part.rotate(Axis((-4.6097722286, -15, 1.25), (0, 0, -1)), F5_ANGLE))


with BuildPart() as f4_1:
    # F5: moved
    add(f4.part.rotate(Axis((-4.6097722286, -15, 1.25), (0, 0, -1)), F5_ANGLE))


with BuildPart() as f3_1:
    # F5: moved
    add(f3.part.rotate(Axis((-4.6097722286, -15, 1.25), (0, 0, -1)), F5_ANGLE))


with BuildPart() as f1_2:
    # F7: moved
    add(f1_1.part.rotate(Axis((-4.6097722286, -15, 1.25), (0, 0, -1)), F7_ANGLE))


with BuildPart() as f2_3:
    # F7: moved
    add(f2_2.part.rotate(Axis((-4.6097722286, -15, 1.25), (0, 0, -1)), F7_ANGLE))


with BuildPart() as f3_2:
    # F7: moved
    add(f3_1.part.rotate(Axis((-4.6097722286, -15, 1.25), (0, 0, -1)), F7_ANGLE))


with BuildPart() as f4_2:
    # F7: moved
    add(f4_1.part.rotate(Axis((-4.6097722286, -15, 1.25), (0, 0, -1)), F7_ANGLE))


solid = Compound([f1_2.part, f2_3.part, f3_2.part, f4_2.part])
